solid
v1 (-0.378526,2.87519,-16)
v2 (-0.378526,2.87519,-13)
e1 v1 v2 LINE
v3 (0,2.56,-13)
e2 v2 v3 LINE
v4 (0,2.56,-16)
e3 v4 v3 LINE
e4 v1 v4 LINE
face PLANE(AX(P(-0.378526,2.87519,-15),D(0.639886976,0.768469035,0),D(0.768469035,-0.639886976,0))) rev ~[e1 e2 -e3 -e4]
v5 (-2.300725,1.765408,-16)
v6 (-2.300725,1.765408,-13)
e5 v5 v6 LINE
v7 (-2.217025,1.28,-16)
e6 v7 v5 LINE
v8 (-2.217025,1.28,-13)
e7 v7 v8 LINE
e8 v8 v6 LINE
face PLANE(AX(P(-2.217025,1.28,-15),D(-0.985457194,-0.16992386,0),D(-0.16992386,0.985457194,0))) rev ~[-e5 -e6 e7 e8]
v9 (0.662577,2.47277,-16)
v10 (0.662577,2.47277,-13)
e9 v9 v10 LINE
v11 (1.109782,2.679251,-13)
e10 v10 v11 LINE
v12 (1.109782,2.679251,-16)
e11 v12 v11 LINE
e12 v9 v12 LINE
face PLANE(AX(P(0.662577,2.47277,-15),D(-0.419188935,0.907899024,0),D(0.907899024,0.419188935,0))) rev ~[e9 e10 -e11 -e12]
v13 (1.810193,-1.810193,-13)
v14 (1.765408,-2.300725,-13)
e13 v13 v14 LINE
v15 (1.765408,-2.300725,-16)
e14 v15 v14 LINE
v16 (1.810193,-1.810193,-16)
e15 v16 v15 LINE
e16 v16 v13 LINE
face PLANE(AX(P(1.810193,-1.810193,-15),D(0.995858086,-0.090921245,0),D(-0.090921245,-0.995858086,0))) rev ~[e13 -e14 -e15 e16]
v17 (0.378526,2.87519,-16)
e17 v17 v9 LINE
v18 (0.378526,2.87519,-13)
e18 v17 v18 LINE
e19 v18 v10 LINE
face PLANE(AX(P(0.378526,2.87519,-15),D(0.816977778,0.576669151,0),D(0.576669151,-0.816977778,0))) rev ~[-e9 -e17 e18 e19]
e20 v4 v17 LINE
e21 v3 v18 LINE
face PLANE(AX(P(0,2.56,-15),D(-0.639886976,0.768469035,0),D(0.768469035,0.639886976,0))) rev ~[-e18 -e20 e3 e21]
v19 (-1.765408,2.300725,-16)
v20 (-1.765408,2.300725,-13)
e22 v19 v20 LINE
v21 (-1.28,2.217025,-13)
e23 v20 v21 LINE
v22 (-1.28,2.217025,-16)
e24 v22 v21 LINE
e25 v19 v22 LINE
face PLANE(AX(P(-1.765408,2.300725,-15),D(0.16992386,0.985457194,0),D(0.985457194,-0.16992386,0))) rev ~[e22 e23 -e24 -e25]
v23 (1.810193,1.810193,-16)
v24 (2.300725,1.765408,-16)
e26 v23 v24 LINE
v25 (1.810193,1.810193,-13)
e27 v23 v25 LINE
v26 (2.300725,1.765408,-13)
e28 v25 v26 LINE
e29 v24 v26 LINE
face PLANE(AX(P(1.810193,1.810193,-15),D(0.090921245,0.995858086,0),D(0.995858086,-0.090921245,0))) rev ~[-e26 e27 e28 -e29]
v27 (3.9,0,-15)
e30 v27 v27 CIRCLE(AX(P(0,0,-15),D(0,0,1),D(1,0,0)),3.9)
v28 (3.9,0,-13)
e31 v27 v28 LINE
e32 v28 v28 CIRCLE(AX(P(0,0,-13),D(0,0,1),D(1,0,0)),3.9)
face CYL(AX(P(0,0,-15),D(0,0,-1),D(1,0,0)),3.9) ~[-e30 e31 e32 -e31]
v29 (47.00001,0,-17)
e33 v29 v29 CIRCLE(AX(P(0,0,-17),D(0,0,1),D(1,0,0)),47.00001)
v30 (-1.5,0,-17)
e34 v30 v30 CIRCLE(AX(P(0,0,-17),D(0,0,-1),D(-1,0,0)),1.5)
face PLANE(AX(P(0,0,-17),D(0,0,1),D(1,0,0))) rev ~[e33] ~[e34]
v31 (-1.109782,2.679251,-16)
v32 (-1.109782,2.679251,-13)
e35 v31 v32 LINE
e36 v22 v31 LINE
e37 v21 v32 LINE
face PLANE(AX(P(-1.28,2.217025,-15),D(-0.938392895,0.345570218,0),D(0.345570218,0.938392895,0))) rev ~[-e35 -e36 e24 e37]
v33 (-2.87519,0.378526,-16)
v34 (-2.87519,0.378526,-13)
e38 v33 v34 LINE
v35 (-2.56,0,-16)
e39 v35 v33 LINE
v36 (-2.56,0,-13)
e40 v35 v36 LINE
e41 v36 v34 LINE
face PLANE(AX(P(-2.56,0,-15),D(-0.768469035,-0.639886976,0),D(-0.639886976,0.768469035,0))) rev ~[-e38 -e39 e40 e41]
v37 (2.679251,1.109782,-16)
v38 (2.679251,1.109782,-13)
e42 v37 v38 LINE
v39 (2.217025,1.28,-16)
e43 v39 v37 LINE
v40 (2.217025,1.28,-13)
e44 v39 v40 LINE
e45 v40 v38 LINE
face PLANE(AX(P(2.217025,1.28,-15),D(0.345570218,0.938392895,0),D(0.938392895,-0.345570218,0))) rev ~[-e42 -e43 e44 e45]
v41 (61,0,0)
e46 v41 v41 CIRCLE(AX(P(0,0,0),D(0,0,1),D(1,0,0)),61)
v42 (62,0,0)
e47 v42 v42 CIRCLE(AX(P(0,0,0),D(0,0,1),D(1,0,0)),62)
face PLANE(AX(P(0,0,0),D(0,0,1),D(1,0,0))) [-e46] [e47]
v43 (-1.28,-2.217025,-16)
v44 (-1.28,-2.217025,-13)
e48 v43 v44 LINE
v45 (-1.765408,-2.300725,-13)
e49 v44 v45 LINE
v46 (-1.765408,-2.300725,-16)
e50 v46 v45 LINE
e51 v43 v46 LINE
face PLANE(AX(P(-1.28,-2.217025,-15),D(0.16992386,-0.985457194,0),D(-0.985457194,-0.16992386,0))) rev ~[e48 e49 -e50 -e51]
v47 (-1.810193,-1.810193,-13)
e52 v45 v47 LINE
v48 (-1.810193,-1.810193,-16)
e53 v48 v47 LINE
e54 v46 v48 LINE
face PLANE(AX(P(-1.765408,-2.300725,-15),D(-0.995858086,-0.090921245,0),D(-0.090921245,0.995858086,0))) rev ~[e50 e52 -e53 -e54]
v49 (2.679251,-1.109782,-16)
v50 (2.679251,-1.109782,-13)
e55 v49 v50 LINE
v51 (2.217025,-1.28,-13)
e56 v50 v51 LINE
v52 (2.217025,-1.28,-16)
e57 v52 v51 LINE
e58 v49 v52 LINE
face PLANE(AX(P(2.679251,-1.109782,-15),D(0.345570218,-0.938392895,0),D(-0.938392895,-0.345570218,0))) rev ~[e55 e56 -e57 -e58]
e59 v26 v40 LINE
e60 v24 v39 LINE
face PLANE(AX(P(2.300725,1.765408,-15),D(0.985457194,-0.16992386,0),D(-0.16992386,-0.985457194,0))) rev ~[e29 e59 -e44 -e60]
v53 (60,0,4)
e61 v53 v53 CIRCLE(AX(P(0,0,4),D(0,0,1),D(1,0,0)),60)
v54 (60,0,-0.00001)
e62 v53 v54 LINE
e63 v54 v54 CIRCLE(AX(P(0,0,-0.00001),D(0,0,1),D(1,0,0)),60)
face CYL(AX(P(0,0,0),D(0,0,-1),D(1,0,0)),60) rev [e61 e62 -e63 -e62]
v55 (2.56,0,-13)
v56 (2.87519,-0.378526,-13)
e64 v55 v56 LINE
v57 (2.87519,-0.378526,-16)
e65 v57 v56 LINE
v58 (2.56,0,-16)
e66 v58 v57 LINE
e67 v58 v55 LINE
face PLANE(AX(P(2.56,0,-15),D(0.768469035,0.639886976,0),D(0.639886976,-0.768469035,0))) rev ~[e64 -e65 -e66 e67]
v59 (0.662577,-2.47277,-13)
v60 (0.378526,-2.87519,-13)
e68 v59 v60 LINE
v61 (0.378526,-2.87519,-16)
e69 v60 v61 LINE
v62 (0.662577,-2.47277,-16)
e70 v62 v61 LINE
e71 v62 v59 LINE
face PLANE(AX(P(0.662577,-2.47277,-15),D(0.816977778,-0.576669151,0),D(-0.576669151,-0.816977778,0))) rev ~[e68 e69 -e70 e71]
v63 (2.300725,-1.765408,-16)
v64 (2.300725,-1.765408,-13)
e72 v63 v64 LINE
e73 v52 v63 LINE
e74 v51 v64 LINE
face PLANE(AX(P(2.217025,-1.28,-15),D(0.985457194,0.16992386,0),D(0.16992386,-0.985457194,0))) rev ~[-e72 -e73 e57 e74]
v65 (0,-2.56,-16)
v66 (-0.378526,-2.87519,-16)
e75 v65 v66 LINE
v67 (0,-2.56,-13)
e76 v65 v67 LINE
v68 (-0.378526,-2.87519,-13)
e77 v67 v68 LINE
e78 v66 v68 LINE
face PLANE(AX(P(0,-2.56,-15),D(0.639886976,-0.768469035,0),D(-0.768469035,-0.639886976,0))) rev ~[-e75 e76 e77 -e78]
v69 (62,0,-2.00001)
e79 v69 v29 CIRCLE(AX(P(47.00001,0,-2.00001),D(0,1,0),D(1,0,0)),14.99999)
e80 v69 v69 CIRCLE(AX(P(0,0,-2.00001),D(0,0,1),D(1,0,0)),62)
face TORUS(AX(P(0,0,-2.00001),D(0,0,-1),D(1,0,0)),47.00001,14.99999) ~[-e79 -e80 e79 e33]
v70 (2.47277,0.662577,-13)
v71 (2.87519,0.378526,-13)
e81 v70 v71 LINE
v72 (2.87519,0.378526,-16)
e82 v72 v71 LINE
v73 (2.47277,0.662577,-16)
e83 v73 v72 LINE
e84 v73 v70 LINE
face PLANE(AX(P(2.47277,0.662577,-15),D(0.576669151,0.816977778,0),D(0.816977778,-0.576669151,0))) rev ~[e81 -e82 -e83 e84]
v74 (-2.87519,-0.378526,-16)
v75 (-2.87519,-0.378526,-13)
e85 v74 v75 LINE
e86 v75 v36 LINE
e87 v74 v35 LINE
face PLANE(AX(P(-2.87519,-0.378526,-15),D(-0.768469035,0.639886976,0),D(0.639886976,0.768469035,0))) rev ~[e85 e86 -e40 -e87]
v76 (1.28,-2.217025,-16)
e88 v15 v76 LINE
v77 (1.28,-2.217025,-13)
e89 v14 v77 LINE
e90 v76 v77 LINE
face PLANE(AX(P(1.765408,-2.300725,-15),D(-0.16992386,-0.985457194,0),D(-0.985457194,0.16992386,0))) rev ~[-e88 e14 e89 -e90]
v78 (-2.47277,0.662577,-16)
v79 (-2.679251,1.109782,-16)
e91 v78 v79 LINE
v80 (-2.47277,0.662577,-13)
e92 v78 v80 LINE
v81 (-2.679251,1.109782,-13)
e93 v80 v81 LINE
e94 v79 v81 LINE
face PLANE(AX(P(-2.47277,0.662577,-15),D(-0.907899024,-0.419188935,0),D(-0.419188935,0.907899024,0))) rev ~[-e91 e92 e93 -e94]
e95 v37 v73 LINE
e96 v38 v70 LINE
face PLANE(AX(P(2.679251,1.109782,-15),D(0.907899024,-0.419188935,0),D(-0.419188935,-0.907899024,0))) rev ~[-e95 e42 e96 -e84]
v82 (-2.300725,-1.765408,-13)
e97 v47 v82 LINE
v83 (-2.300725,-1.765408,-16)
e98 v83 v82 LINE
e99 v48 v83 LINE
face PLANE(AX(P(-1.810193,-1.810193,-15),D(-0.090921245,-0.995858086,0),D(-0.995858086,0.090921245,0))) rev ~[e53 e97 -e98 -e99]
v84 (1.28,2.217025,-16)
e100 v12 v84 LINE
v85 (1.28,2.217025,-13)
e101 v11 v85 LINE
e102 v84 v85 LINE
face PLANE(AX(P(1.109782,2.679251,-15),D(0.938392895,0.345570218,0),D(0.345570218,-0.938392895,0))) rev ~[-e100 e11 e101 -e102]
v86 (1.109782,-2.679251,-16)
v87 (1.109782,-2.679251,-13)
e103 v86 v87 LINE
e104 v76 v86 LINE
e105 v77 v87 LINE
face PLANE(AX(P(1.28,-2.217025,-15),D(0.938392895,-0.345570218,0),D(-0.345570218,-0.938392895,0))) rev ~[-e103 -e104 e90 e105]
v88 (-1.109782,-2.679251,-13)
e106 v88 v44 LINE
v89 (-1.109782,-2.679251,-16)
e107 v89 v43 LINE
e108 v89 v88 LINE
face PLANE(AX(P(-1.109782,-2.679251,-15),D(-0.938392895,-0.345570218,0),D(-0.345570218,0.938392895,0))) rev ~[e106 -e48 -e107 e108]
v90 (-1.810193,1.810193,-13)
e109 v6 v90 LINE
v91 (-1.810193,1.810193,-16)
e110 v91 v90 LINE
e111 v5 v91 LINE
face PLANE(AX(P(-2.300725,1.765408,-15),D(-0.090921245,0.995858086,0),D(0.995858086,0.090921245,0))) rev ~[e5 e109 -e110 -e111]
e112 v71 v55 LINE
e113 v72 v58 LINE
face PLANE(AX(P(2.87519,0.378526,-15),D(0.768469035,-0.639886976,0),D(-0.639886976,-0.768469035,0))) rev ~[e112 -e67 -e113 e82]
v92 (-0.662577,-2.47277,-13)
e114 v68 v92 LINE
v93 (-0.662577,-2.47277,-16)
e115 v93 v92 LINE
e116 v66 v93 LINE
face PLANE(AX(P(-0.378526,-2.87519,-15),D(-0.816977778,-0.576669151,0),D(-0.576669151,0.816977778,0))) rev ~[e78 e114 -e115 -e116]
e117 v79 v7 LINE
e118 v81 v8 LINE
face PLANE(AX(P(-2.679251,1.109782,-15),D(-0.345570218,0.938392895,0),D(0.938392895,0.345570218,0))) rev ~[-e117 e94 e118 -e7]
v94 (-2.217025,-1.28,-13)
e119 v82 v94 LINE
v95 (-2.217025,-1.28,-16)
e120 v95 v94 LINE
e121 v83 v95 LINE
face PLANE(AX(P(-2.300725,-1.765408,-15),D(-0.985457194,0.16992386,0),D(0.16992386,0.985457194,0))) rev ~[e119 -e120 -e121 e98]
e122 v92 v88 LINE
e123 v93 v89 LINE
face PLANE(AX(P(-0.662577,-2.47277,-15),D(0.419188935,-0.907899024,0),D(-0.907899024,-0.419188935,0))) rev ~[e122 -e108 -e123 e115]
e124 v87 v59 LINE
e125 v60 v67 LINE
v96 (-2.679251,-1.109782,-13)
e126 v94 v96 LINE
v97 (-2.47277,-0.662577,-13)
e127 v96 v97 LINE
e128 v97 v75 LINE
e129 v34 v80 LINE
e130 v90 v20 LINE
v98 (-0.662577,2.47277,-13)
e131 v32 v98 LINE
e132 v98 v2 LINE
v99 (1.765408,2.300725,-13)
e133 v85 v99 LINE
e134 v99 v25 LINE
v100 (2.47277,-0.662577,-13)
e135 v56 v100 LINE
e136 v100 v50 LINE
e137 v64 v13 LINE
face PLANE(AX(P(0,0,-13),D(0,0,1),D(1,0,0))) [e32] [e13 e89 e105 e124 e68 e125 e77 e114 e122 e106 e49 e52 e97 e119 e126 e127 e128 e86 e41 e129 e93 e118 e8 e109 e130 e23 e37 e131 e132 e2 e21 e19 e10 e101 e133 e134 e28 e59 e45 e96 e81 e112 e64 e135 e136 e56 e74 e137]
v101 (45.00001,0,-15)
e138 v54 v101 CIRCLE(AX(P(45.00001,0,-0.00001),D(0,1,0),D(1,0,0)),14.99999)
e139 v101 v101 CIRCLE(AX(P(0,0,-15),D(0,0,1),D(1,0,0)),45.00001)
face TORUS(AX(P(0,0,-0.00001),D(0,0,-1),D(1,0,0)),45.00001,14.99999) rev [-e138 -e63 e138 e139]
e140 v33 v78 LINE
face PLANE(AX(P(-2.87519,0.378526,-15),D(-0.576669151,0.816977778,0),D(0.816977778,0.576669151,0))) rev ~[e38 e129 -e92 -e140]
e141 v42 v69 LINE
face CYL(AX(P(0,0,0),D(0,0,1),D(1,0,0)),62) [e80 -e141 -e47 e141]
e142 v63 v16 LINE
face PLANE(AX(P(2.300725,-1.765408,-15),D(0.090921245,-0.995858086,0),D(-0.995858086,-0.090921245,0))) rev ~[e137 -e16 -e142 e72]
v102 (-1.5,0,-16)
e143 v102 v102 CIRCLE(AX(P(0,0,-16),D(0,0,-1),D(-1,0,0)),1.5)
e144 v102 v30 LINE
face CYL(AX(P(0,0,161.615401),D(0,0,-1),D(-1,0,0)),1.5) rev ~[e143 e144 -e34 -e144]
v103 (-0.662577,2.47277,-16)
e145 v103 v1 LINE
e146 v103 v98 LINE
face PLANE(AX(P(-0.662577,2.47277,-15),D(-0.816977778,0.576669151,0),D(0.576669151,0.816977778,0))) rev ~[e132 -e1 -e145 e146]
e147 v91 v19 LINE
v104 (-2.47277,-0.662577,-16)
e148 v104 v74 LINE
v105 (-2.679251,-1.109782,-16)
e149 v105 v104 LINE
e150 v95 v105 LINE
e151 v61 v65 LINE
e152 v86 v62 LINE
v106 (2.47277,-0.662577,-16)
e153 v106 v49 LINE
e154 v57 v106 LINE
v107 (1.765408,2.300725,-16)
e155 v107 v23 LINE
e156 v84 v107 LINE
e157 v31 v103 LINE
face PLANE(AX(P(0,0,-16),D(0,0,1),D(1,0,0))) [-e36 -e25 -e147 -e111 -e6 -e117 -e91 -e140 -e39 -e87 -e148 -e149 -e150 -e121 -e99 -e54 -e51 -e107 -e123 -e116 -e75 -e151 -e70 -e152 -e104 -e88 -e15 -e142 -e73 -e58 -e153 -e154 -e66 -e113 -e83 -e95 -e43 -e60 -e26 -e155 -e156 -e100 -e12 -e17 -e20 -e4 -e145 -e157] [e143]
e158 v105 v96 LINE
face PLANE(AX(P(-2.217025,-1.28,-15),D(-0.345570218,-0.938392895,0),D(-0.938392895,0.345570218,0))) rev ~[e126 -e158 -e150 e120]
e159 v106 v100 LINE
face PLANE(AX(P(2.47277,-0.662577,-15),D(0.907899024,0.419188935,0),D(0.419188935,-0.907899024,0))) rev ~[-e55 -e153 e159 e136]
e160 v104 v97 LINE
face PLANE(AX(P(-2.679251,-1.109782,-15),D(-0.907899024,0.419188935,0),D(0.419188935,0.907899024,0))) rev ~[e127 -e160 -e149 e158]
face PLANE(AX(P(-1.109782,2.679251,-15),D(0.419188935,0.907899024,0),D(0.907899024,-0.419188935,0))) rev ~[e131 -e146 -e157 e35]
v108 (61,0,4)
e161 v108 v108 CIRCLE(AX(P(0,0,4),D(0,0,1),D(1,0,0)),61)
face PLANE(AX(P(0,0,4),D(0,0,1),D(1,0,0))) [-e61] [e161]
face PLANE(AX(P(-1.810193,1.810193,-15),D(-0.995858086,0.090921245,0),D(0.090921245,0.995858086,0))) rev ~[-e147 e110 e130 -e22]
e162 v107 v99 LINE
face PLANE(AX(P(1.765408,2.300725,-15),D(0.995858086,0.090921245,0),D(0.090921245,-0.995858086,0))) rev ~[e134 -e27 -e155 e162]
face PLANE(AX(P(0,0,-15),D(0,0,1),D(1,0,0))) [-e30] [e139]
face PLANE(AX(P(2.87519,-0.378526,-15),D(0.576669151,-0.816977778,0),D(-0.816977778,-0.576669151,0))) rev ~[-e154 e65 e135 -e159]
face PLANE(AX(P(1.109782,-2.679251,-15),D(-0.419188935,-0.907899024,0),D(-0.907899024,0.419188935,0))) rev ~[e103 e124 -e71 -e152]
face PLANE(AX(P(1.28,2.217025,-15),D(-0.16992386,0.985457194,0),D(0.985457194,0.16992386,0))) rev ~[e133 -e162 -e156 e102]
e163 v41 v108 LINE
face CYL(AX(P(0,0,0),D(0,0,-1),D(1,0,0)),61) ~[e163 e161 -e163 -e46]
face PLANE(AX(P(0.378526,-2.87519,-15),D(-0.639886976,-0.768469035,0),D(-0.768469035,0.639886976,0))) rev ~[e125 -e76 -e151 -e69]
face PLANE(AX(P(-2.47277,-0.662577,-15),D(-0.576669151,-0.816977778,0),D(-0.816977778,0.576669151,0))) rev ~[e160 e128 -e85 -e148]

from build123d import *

# Parameters (mm, degrees)
F0_R     = 62
F1_DEPTH = 17
F2_R     = 60
F3_DEPTH = 15
F4_R     = 14.99999
F5_R     = 61
F5_R_2   = 60
F6_DEPTH = 4
F7_R     = 3.9
F8_DEPTH = 2
F9_DEPTH = 1
F10_D    = 3


# Not quite as in the source:
# - a fillet or chamfer is up to 0.001 mm smaller than in the source, because OpenCascade refuses the exact size


with BuildPart() as f1:
    # F0 (on Top) → F1 (new body)
    with BuildSketch(Plane.XY):
        Circle(F0_R)
    extrude(amount=-F1_DEPTH)

    # F2 (on face) → F3 (cut)
    with BuildSketch(Plane.XY):
        Circle(F2_R)
    extrude(amount=-F3_DEPTH, mode=Mode.SUBTRACT)

    # F4 (radius 15 in the source; OpenCascade refuses exactly that, so slightly less here)
    f4_edges = [f1.edges().sort_by_distance(p)[0] for p in [
        (-60, 0, -15),
        (-62, 0, -17),
    ]]
    fillet(f4_edges, radius=F4_R)

    # F5 (on face) → F6 (join)
    with BuildSketch(Plane.XY):
        Circle(F5_R)
        Circle(F5_R_2, mode=Mode.SUBTRACT)
    extrude(amount=F6_DEPTH)

    # F7 (on face) → F8 (join)
    with BuildSketch(Plane.XY.offset(-15)):
        Circle(F7_R)
        with BuildLine():
            ThreePointArc((2.6792506443, 1.1097819539), (2.8011848962, 0.7505752308), (2.875190098, 0.3785259574))
            ThreePointArc((2.875190098, 0.3785259574), (2.8937908774, 0.1896690748), (2.9, 0))
            ThreePointArc((2.9, 0), (2.8937908774, -0.1896690748), (2.875190098, -0.3785259574))
            ThreePointArc((2.875190098, -0.3785259574), (2.8011848962, -0.7505752308), (2.6792506443, -1.1097819539))
            ThreePointArc((2.6792506443, -1.1097819539), (2.511473671, -1.45), (2.3007246868, -1.7654081441))
            ThreePointArc((2.3007246868, -1.7654081441), (2.0506096654, -2.0506096654), (1.7654081441, -2.3007246868))
            ThreePointArc((1.7654081441, -2.3007246868), (1.45, -2.511473671), (1.1097819539, -2.6792506443))
            ThreePointArc((1.1097819539, -2.6792506443), (0.7505752308, -2.8011848962), (0.3785259574, -2.875190098))
            ThreePointArc((0.3785259574, -2.875190098), (0, -2.9), (-0.3785259574, -2.875190098))
            ThreePointArc((-0.3785259574, -2.875190098), (-0.7505752308, -2.8011848962), (-1.1097819539, -2.6792506443))
            ThreePointArc((-1.1097819539, -2.6792506443), (-1.45, -2.511473671), (-1.7654081441, -2.3007246868))
            ThreePointArc((-1.7654081441, -2.3007246868), (-2.0506096654, -2.0506096654), (-2.3007246868, -1.7654081441))
            ThreePointArc((-2.3007246868, -1.7654081441), (-2.511473671, -1.45), (-2.6792506443, -1.1097819539))
            ThreePointArc((-2.6792506443, -1.1097819539), (-2.8011848962, -0.7505752308), (-2.875190098, -0.3785259574))
            ThreePointArc((-2.875190098, -0.3785259574), (-2.9, 0), (-2.875190098, 0.3785259574))
            ThreePointArc((-2.875190098, 0.3785259574), (-2.8011848962, 0.7505752308), (-2.6792506443, 1.1097819539))
            ThreePointArc((-2.6792506443, 1.1097819539), (-2.511473671, 1.45), (-2.3007246868, 1.7654081441))
            ThreePointArc((-2.3007246868, 1.7654081441), (-2.0506096654, 2.0506096654), (-1.7654081441, 2.3007246868))
            ThreePointArc((-1.7654081441, 2.3007246868), (-1.45, 2.511473671), (-1.1097819539, 2.6792506443))
            ThreePointArc((-1.1097819539, 2.6792506443), (-0.7505752308, 2.8011848962), (-0.3785259574, 2.875190098))
            ThreePointArc((-0.3785259574, 2.875190098), (0, 2.9), (0.3785259574, 2.875190098))
            ThreePointArc((0.3785259574, 2.875190098), (0.7505752308, 2.8011848962), (1.1097819539, 2.6792506443))
            ThreePointArc((1.1097819539, 2.6792506443), (1.45, 2.511473671), (1.7654081441, 2.3007246868))
            ThreePointArc((1.7654081441, 2.3007246868), (2.0506096654, 2.0506096654), (2.3007246868, 1.7654081441))
            ThreePointArc((2.3007246868, 1.7654081441), (2.511473671, 1.45), (2.6792506443, 1.1097819539))
        make_face(mode=Mode.SUBTRACT)
        with BuildLine():
            Line((-2.6792506443, 1.1097819539), (-2.2170250337, 1.28))
            Line((-2.2170250337, 1.28), (-2.3007246868, 1.7654081441))
            ThreePointArc((-2.3007246868, 1.7654081441), (-2.511473671, 1.45), (-2.6792506443, 1.1097819539))
        make_face()
        with BuildLine():
            Line((-2.3007246868, 1.7654081441), (-1.8101933598, 1.8101933598))
            Line((-1.8101933598, 1.8101933598), (-1.7654081441, 2.3007246868))
            ThreePointArc((-1.7654081441, 2.3007246868), (-2.0506096654, 2.0506096654), (-2.3007246868, 1.7654081441))
        make_face()
        with BuildLine():
            Line((-1.7654081441, 2.3007246868), (-1.28, 2.2170250337))
            Line((-1.28, 2.2170250337), (-1.1097819539, 2.6792506443))
            ThreePointArc((-1.1097819539, 2.6792506443), (-1.45, 2.511473671), (-1.7654081441, 2.3007246868))
        make_face()
        with BuildLine():
            Line((-1.1097819539, 2.6792506443), (-0.6625767555, 2.4727701153))
            Line((-0.6625767555, 2.4727701153), (-0.3785259574, 2.875190098))
            ThreePointArc((-0.3785259574, 2.875190098), (-0.7505752308, 2.8011848962), (-1.1097819539, 2.6792506443))
        make_face()
        with BuildLine():
            Line((-0.3785259574, 2.875190098), (0, 2.56))
            Line((0, 2.56), (0.3785259574, 2.875190098))
            ThreePointArc((0.3785259574, 2.875190098), (0, 2.9), (-0.3785259574, 2.875190098))
        make_face()
        with BuildLine():
            Line((0.3785259574, 2.875190098), (0.6625767555, 2.4727701153))
            Line((0.6625767555, 2.4727701153), (1.1097819539, 2.6792506443))
            ThreePointArc((1.1097819539, 2.6792506443), (0.7505752308, 2.8011848962), (0.3785259574, 2.875190098))
        make_face()
        with BuildLine():
            Line((1.1097819539, 2.6792506443), (1.28, 2.2170250337))
            Line((1.28, 2.2170250337), (1.7654081441, 2.3007246868))
            ThreePointArc((1.7654081441, 2.3007246868), (1.45, 2.511473671), (1.1097819539, 2.6792506443))
        make_face()
        with BuildLine():
            Line((1.7654081441, 2.3007246868), (1.8101933598, 1.8101933598))
            Line((1.8101933598, 1.8101933598), (2.3007246868, 1.7654081441))
            ThreePointArc((2.3007246868, 1.7654081441), (2.0506096654, 2.0506096654), (1.7654081441, 2.3007246868))
        make_face()
        with BuildLine():
            Line((2.3007246868, 1.7654081441), (2.2170250337, 1.28))
            Line((2.2170250337, 1.28), (2.6792506443, 1.1097819539))
            ThreePointArc((2.6792506443, 1.1097819539), (2.511473671, 1.45), (2.3007246868, 1.7654081441))
        make_face()
        with BuildLine():
            Line((2.6792506443, 1.1097819539), (2.4727701153, 0.6625767555))
            Line((2.4727701153, 0.6625767555), (2.875190098, 0.3785259574))
            ThreePointArc((2.875190098, 0.3785259574), (2.8011848962, 0.7505752308), (2.6792506443, 1.1097819539))
        make_face()
        with BuildLine():
            ThreePointArc((2.9, 0), (2.8937908774, 0.1896690748), (2.875190098, 0.3785259574))
            Line((2.875190098, 0.3785259574), (2.56, 0))
            Line((2.56, 0), (2.875190098, -0.3785259574))
            ThreePointArc((2.875190098, -0.3785259574), (2.8937908774, -0.1896690748), (2.9, 0))
        make_face()
        with BuildLine():
            Line((2.875190098, -0.3785259574), (2.4727701153, -0.6625767555))
            Line((2.4727701153, -0.6625767555), (2.6792506443, -1.1097819539))
            ThreePointArc((2.6792506443, -1.1097819539), (2.8011848962, -0.7505752308), (2.875190098, -0.3785259574))
        make_face()
        with BuildLine():
            Line((2.6792506443, -1.1097819539), (2.2170250337, -1.28))
            Line((2.2170250337, -1.28), (2.3007246868, -1.7654081441))
            ThreePointArc((2.3007246868, -1.7654081441), (2.511473671, -1.45), (2.6792506443, -1.1097819539))
        make_face()
        with BuildLine():
            Line((2.3007246868, -1.7654081441), (1.8101933598, -1.8101933598))
            Line((1.8101933598, -1.8101933598), (1.7654081441, -2.3007246868))
            ThreePointArc((1.7654081441, -2.3007246868), (2.0506096654, -2.0506096654), (2.3007246868, -1.7654081441))
        make_face()
        with BuildLine():
            Line((1.7654081441, -2.3007246868), (1.28, -2.2170250337))
            Line((1.28, -2.2170250337), (1.1097819539, -2.6792506443))
            ThreePointArc((1.1097819539, -2.6792506443), (1.45, -2.511473671), (1.7654081441, -2.3007246868))
        make_face()
        with BuildLine():
            Line((-2.875190098, 0.3785259574), (-2.4727701153, 0.6625767555))
            Line((-2.4727701153, 0.6625767555), (-2.6792506443, 1.1097819539))
            ThreePointArc((-2.6792506443, 1.1097819539), (-2.8011848962, 0.7505752308), (-2.875190098, 0.3785259574))
        make_face()
        with BuildLine():
            Line((-2.875190098, -0.3785259574), (-2.56, 0))
            Line((-2.56, 0), (-2.875190098, 0.3785259574))
            ThreePointArc((-2.875190098, 0.3785259574), (-2.9, 0), (-2.875190098, -0.3785259574))
        make_face()
        with BuildLine():
            Line((-2.6792506443, -1.1097819539), (-2.4727701153, -0.6625767555))
            Line((-2.4727701153, -0.6625767555), (-2.875190098, -0.3785259574))
            ThreePointArc((-2.875190098, -0.3785259574), (-2.8011848962, -0.7505752308), (-2.6792506443, -1.1097819539))
        make_face()
        with BuildLine():
            Line((-2.3007246868, -1.7654081441), (-2.2170250337, -1.28))
            Line((-2.2170250337, -1.28), (-2.6792506443, -1.1097819539))
            ThreePointArc((-2.6792506443, -1.1097819539), (-2.511473671, -1.45), (-2.3007246868, -1.7654081441))
        make_face()
        with BuildLine():
            Line((-1.7654081441, -2.3007246868), (-1.8101933598, -1.8101933598))
            Line((-1.8101933598, -1.8101933598), (-2.3007246868, -1.7654081441))
            ThreePointArc((-2.3007246868, -1.7654081441), (-2.0506096654, -2.0506096654), (-1.7654081441, -2.3007246868))
        make_face()
        with BuildLine():
            Line((-1.1097819539, -2.6792506443), (-1.28, -2.2170250337))
            Line((-1.28, -2.2170250337), (-1.7654081441, -2.3007246868))
            ThreePointArc((-1.7654081441, -2.3007246868), (-1.45, -2.511473671), (-1.1097819539, -2.6792506443))
        make_face()
        with BuildLine():
            Line((-0.3785259574, -2.875190098), (-0.6625767555, -2.4727701153))
            Line((-0.6625767555, -2.4727701153), (-1.1097819539, -2.6792506443))
            ThreePointArc((-1.1097819539, -2.6792506443), (-0.7505752308, -2.8011848962), (-0.3785259574, -2.875190098))
        make_face()
        with BuildLine():
            Line((0.3785259574, -2.875190098), (0, -2.56))
            Line((0, -2.56), (-0.3785259574, -2.875190098))
            ThreePointArc((-0.3785259574, -2.875190098), (0, -2.9), (0.3785259574, -2.875190098))
        make_face()
        with BuildLine():
            Line((1.1097819539, -2.6792506443), (0.6625767555, -2.4727701153))
            Line((0.6625767555, -2.4727701153), (0.3785259574, -2.875190098))
            ThreePointArc((0.3785259574, -2.875190098), (0.7505752308, -2.8011848962), (1.1097819539, -2.6792506443))
        make_face()
    extrude(amount=F8_DEPTH)

    # F9 (cut): a face of the model
    f9_faces = [f1.faces().sort_by_distance(p)[0] for p in [
        (0, 0, -15),
    ]]
    extrude(f9_faces, amount=-F9_DEPTH, mode=Mode.SUBTRACT)

    # F10 (through all)
    with Locations(Plane.XY.offset(-15)):
        with Locations((0, 0)):
            Hole(F10_D / 2)


solid = f1.part
